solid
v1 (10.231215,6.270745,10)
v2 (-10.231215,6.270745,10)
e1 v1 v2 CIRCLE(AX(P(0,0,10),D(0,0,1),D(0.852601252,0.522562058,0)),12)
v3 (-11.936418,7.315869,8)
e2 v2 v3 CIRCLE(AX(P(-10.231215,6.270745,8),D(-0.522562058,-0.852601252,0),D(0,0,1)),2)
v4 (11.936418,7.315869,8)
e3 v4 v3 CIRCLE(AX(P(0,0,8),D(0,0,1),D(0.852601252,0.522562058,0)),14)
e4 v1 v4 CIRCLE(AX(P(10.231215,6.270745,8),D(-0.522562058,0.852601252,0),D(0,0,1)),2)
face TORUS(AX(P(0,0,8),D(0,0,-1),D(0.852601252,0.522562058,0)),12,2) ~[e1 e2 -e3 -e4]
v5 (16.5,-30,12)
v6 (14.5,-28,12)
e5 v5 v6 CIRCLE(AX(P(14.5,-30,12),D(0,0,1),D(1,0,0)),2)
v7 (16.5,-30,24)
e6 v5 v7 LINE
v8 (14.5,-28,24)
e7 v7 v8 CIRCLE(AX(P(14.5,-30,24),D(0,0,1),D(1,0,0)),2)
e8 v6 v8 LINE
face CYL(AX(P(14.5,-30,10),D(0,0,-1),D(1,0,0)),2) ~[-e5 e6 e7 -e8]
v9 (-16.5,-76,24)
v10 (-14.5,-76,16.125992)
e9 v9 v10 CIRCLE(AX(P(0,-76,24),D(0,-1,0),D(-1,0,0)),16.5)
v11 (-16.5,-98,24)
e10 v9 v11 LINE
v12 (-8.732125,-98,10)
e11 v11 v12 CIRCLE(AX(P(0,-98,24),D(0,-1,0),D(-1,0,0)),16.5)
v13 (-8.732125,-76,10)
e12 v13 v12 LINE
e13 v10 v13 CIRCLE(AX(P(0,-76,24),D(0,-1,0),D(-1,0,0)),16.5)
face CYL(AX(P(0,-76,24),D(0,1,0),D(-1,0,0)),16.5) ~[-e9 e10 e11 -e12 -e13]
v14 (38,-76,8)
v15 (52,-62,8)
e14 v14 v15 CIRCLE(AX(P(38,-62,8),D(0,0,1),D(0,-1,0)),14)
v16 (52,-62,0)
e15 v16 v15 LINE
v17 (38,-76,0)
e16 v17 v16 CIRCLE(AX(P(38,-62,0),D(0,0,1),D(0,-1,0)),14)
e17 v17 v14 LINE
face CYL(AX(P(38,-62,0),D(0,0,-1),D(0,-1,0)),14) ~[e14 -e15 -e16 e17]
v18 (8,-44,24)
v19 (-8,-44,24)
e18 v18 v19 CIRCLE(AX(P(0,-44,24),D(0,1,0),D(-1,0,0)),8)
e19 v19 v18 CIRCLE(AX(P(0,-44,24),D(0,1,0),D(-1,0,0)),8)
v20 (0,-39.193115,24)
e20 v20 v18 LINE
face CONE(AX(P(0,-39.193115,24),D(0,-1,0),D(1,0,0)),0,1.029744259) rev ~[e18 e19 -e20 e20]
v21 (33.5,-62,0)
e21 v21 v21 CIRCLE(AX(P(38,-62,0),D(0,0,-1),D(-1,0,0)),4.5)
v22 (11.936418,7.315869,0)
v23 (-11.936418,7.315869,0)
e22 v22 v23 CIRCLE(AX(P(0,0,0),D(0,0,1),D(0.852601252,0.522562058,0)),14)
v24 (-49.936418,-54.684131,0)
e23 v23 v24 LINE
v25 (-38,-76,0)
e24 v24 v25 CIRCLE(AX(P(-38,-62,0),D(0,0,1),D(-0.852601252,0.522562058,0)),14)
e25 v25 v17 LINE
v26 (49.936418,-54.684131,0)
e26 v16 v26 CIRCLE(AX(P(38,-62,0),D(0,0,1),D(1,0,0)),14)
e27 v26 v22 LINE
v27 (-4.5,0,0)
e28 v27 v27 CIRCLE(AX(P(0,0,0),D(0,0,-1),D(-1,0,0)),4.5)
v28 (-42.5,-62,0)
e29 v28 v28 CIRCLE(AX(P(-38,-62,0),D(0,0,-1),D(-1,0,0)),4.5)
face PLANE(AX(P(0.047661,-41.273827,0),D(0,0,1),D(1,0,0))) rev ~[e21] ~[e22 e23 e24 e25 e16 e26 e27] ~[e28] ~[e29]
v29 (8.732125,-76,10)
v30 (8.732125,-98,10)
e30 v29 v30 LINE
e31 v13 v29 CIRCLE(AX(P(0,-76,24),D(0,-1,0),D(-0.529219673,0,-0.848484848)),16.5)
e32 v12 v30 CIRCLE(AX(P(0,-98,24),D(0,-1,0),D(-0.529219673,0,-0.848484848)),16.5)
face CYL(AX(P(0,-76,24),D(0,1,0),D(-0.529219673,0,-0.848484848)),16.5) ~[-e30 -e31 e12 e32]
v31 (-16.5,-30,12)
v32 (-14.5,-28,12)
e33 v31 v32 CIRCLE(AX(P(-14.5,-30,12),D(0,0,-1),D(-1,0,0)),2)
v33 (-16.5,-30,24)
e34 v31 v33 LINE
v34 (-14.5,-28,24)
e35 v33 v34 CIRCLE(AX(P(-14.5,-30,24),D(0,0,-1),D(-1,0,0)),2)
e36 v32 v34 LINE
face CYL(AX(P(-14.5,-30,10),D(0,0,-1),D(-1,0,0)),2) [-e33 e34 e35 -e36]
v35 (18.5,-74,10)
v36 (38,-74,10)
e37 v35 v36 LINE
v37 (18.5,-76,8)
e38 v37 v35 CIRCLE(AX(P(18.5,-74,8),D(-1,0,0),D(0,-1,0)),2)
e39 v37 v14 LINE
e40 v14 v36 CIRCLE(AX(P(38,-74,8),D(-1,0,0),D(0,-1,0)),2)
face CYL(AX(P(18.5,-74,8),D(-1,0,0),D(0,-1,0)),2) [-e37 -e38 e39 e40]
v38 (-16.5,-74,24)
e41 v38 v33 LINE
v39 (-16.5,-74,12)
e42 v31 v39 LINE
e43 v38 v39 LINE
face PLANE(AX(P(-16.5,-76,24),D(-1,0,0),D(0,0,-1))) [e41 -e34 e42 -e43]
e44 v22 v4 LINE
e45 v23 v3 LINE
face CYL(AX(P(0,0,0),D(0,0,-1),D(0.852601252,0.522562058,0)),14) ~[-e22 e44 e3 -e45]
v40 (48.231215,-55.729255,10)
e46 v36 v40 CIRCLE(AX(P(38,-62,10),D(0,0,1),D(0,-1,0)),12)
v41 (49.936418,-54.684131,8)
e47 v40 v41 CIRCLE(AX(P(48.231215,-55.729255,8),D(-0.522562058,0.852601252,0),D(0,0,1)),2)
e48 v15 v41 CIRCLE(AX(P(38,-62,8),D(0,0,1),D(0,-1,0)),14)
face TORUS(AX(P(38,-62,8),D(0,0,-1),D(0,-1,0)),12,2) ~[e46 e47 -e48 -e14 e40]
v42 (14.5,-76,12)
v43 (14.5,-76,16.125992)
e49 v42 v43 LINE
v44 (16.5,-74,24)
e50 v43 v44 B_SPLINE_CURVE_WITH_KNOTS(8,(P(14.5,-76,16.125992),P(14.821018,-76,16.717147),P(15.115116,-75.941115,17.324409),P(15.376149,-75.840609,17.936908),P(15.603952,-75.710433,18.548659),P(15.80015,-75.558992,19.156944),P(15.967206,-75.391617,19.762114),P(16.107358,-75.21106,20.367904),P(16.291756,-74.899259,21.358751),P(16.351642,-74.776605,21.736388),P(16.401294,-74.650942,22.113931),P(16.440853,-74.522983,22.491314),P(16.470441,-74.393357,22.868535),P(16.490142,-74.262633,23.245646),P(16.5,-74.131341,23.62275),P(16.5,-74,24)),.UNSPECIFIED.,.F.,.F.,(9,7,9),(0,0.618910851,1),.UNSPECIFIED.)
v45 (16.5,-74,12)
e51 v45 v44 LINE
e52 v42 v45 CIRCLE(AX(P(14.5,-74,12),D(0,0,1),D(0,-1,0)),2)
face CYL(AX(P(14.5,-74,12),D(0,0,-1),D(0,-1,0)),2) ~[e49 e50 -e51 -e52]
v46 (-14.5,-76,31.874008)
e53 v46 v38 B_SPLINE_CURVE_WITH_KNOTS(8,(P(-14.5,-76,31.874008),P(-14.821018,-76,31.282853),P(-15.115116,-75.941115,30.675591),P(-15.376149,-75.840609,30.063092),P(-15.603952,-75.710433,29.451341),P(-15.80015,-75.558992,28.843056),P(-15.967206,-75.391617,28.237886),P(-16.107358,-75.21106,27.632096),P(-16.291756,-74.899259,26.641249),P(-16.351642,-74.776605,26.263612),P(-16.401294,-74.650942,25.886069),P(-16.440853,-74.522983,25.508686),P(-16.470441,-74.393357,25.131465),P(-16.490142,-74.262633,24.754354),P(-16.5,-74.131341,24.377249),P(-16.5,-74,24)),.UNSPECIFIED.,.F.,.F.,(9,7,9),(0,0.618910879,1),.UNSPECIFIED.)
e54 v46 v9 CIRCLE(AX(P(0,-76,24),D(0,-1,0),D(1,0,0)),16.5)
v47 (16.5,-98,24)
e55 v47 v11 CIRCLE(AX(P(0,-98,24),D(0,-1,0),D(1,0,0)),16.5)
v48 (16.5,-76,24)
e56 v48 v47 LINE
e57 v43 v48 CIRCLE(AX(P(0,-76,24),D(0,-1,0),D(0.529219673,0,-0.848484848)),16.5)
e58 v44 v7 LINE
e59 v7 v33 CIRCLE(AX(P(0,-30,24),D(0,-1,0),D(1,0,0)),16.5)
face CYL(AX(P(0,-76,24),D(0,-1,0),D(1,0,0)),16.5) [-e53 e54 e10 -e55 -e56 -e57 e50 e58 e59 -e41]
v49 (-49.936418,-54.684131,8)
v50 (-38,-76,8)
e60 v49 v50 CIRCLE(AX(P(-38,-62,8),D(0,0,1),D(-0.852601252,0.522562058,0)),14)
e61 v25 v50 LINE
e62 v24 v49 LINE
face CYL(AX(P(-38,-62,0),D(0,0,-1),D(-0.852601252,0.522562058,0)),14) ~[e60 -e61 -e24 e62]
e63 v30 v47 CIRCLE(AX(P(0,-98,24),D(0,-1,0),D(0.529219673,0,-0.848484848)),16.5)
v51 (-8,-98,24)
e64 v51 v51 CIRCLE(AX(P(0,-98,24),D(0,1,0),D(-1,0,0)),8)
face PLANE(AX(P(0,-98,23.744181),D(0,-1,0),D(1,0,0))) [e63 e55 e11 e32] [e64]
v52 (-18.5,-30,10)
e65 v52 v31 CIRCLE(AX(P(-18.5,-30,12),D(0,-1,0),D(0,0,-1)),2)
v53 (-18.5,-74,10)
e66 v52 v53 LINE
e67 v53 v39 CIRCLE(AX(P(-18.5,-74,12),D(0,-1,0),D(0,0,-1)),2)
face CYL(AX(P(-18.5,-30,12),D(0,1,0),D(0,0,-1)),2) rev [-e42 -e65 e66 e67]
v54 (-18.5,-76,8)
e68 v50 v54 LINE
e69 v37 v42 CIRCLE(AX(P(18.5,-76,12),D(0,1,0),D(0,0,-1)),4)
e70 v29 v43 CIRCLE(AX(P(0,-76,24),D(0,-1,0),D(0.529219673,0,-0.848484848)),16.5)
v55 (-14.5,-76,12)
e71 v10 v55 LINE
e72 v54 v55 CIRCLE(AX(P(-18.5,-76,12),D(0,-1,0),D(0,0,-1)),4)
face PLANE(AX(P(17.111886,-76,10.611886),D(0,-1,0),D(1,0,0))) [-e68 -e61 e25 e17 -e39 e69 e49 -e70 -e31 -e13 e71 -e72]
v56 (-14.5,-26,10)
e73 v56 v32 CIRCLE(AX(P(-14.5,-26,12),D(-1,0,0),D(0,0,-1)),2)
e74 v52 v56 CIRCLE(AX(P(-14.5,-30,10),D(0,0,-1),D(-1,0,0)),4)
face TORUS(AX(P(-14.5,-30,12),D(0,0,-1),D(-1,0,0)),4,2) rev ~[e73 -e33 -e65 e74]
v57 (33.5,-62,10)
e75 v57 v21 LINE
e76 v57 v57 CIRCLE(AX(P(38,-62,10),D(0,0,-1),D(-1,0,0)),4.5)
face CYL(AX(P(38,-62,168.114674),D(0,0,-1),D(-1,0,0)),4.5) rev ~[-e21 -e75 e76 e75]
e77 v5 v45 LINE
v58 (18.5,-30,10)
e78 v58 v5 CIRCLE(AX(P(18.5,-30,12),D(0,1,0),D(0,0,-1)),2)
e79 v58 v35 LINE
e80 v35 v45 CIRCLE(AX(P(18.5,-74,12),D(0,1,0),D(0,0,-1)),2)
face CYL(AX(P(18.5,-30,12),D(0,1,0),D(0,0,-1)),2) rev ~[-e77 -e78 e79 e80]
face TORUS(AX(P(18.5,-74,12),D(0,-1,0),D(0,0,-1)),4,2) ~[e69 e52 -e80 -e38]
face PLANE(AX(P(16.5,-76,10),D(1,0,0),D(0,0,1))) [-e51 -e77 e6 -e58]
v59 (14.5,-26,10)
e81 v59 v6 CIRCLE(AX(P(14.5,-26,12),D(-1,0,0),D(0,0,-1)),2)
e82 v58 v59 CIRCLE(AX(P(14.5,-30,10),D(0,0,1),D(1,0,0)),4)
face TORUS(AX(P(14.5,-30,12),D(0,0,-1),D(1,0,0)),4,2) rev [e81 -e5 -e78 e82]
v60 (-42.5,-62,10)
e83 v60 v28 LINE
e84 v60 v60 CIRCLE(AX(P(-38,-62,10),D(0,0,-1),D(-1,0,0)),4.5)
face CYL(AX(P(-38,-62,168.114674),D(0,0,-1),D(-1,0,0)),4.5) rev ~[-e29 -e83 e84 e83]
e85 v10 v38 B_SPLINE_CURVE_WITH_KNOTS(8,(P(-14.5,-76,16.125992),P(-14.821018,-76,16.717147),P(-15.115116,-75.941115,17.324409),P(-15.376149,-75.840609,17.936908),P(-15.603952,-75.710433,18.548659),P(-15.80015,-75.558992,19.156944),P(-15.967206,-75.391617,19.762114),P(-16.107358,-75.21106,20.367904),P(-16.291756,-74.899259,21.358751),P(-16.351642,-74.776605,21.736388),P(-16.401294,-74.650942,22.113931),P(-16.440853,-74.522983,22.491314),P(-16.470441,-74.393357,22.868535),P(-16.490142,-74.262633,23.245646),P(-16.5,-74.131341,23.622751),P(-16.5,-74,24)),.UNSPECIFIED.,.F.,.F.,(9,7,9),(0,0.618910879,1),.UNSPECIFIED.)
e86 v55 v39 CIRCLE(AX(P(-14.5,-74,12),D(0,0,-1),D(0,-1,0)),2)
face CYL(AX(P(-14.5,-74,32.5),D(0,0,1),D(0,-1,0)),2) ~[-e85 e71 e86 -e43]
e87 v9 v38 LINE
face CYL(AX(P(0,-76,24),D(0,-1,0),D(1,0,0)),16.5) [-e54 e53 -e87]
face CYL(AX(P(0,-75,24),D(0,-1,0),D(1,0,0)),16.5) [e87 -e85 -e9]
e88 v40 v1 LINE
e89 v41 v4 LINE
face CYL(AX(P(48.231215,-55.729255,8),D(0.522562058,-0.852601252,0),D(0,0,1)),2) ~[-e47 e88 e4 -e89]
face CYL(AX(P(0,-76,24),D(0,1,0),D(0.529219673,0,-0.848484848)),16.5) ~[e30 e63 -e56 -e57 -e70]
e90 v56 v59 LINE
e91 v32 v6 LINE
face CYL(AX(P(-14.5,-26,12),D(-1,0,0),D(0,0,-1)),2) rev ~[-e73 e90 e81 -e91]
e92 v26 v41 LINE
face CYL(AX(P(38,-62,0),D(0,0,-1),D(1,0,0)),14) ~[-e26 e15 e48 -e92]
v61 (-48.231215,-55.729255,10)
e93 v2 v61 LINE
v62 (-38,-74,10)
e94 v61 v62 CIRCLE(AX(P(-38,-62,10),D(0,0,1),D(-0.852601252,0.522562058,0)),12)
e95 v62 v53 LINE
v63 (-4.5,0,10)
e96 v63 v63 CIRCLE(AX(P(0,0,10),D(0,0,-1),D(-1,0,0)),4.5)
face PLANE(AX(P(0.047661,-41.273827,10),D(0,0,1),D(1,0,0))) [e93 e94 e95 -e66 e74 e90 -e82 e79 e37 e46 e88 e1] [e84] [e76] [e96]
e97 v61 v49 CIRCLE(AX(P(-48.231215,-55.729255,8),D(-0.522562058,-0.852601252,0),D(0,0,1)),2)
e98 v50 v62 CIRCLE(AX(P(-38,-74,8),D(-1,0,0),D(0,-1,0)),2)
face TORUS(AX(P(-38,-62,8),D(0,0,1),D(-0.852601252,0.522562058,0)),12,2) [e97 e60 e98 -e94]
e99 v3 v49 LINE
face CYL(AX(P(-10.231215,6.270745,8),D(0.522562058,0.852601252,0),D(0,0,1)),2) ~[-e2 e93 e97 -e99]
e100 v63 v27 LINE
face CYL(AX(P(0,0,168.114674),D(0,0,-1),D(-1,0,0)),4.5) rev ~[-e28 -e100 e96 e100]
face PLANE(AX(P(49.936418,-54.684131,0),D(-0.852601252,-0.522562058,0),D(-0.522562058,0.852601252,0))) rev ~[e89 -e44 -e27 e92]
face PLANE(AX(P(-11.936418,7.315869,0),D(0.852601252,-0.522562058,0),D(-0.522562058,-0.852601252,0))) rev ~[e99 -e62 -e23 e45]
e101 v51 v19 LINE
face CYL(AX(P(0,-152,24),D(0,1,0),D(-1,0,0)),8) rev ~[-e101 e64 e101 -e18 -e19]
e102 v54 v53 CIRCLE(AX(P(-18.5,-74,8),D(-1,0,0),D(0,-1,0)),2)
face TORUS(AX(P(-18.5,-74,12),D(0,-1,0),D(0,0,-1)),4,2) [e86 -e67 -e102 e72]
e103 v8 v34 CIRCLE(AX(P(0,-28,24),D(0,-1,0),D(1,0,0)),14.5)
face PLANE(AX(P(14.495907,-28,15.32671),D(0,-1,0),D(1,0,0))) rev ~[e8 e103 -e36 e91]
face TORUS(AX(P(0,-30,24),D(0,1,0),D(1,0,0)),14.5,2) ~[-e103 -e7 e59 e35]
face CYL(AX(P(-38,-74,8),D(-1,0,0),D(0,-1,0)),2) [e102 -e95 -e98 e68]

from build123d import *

# Parameters (mm, degrees)
F1_DEPTH     = 10
F3_DEPTH     = 22
F4_DEPTH     = 48
F6_D         = 16
F6_DEPTH     = 54
F6_TIP       = 4.8068849522
F7_T1_DEPTH  = 14
F7_T4_ANGLE  = 180
F7_T5_DEPTH  = 46
F7_T7_DEPTH  = 29
F7_T10_ANGLE = 90
F7_T12_ANGLE = 90
F7_T13_DEPTH = 19.5
F7_T15_DEPTH = 19.5
F7_T17_DEPTH = 72.7186358508
F7_T19_DEPTH = 72.7186358508
F7_T22_ANGLE = 121.5042667192
F7_T26_DEPTH = 20.5
F7_S27_R     = 16.5
F7_T28_DEPTH = 12
F7_T32_DEPTH = 20.5
F7_S33_R     = 16.5
F7_T34_DEPTH = 12
F7_T36_ANGLE = 121.5042667192
F7_T38_ANGLE = 116.9914665616
F7_T40_ANGLE = 90
F7_T42_ANGLE = 90
F9_D         = 9


# Not quite as in the source:
# - a fillet or chamfer that OpenCascade refuses, or shapes differently, is made with other operations: its cross-section is extruded or revolved along the edge and cut away or added


with BuildPart() as f1:
    # F0 (on Top) → F1 (new body)
    with BuildSketch(Plane.XY):
        with BuildLine():
            ThreePointArc((11.9364175338, 7.315868811), (13.4742318051, 3.8006680023), (14, 0))
            ThreePointArc((14, 0), (-3.8006680023, -13.4742318051), (-11.9364175338, 7.315868811))
            Line((-11.9364175338, 7.315868811), (-49.9364175338, -54.684131189))
            ThreePointArc((-49.9364175338, -54.684131189), (-34.1993319977, -48.5257681949), (-24, -62))
            ThreePointArc((-24, -62), (-28.1005050634, -71.8994949366), (-38, -76))
            Line((-38, -76), (38, -76))
            ThreePointArc((38, -76), (25.7848012019, -55.1597574368), (49.9364175338, -54.684131189))
            Line((49.9364175338, -54.684131189), (11.9364175338, 7.315868811))
        make_face()
        with BuildLine():
            ThreePointArc((-24, -62), (-34.1993319977, -48.5257681949), (-49.9364175338, -54.684131189))
            ThreePointArc((-49.9364175338, -54.684131189), (-50.2151987981, -68.8402425632), (-38, -76))
            ThreePointArc((-38, -76), (-28.1005050634, -71.8994949366), (-24, -62))
        make_face()
        with BuildLine():
            ThreePointArc((-11.9364175338, 7.315868811), (-3.8006680023, -13.4742318051), (14, 0))
            ThreePointArc((14, 0), (13.4742318051, 3.8006680023), (11.9364175338, 7.315868811))
            ThreePointArc((11.9364175338, 7.315868811), (0, 14), (-11.9364175338, 7.315868811))
        make_face()
        with BuildLine():
            ThreePointArc((52, -62), (51.4742318051, -58.1993319977), (49.9364175338, -54.684131189))
            ThreePointArc((49.9364175338, -54.684131189), (25.7848012019, -55.1597574368), (38, -76))
            ThreePointArc((38, -76), (47.8994949366, -71.8994949366), (52, -62))
        make_face()
    extrude(amount=F1_DEPTH)

    # F2 (on face) → F3 (join)
    with BuildSketch(Plane.XZ.offset(76)):
        with BuildLine():
            ThreePointArc((8.7321245983, 10), (14.4279252818, 15.9946910076), (16.5, 24))
            ThreePointArc((16.5, 24), (0, 40.5), (-16.5, 24))
            ThreePointArc((-16.5, 24), (-14.4279252818, 15.9946910076), (-8.7321245983, 10))
            Line((-8.7321245983, 10), (8.7321245983, 10))
        make_face()
        with BuildLine():
            ThreePointArc((-8.7321245983, 10), (0, 7.5), (8.7321245983, 10))
            Line((8.7321245983, 10), (-8.7321245983, 10))
        make_face()
    extrude(amount=F3_DEPTH)

    # F2 (on face) → F4 (join)
    with BuildSketch(Plane.XZ.offset(76)):
        with BuildLine():
            Line((16.5, 10), (16.5, 24))
            ThreePointArc((16.5, 24), (14.4279252818, 15.9946910076), (8.7321245983, 10))
            Line((8.7321245983, 10), (16.5, 10))
        make_face()
        with BuildLine():
            ThreePointArc((8.7321245983, 10), (14.4279252818, 15.9946910076), (16.5, 24))
            ThreePointArc((16.5, 24), (0, 40.5), (-16.5, 24))
            ThreePointArc((-16.5, 24), (-14.4279252818, 15.9946910076), (-8.7321245983, 10))
            Line((-8.7321245983, 10), (8.7321245983, 10))
        make_face()
        with BuildLine():
            ThreePointArc((-8.7321245983, 10), (-14.4279252818, 15.9946910076), (-16.5, 24))
            Line((-16.5, 24), (-16.5, 10))
            Line((-16.5, 10), (-8.7321245983, 10))
        make_face()
    extrude(amount=-F4_DEPTH)

    # F6
    with Locations(Plane.XZ.offset(98)):
        with Locations((0, 24)):
            Hole(F6_D / 2, depth=F6_DEPTH)
            with Locations((0, 0, -(F6_DEPTH + F6_TIP / 2))):  # 118° drill point
                Cone(0, F6_D / 2, F6_TIP, mode=Mode.SUBTRACT)

    # F7: fillet of radius 2 on 15 edges, made by hand

    # F7_s2 → F7_t1 (cut)
    with BuildSketch(Plane.XY.offset(10)):
        with BuildLine():
            ThreePointArc((-16.5, -30), (-15.9142135624, -28.5857864376), (-14.5, -28))
            Line((-14.5, -28), (-16.5, -28))
            Line((-16.5, -28), (-16.5, -30))
        make_face()
        with BuildLine():
            ThreePointArc((16.5, -30), (15.9142135624, -28.5857864376), (14.5, -28))
            Line((14.5, -28), (16.5, -28))
            Line((16.5, -28), (16.5, -30))
        make_face()
    extrude(amount=F7_T1_DEPTH, mode=Mode.SUBTRACT)

    # F7_s3 → F7_t4 (revolve, cut)
    with BuildSketch(Plane.XY.offset(24)):
        with BuildLine():
            ThreePointArc((16.5, -30), (15.9142135624, -28.5857864376), (14.5, -28))
            Line((14.5, -28), (16.5, -28))
            Line((16.5, -28), (16.5, -30))
        make_face()
    revolve(axis=Axis((0, -28, 24), (0, -1, 0)), revolution_arc=F7_T4_ANGLE, mode=Mode.SUBTRACT)

    # F7_s6 → F7_t5 (join)
    with BuildSketch(Plane.XZ.offset(30)):
        with BuildLine():
            ThreePointArc((18.5, 10), (17.0857864376, 10.5857864376), (16.5, 12))
            Line((16.5, 12), (16.5, 10))
            Line((16.5, 10), (18.5, 10))
        make_face()
        with BuildLine():
            ThreePointArc((-18.5, 10), (-17.0857864376, 10.5857864376), (-16.5, 12))
            Line((-16.5, 12), (-16.5, 10))
            Line((-16.5, 10), (-18.5, 10))
        make_face()
    extrude(amount=F7_T5_DEPTH)

    # F7_s8 → F7_t7 (join)
    with BuildSketch(Plane.YZ.offset(-14.5)):
        with BuildLine():
            ThreePointArc((-26, 10), (-27.4142135624, 10.5857864376), (-28, 12))
            Line((-28, 12), (-28, 10))
            Line((-28, 10), (-26, 10))
        make_face()
    extrude(amount=F7_T7_DEPTH)

    # F7_s9 → F7_t10 (revolve)
    with BuildSketch(Plane.XZ.offset(30)):
        with BuildLine():
            ThreePointArc((-18.5, 10), (-17.0857864376, 10.5857864376), (-16.5, 12))
            Line((-16.5, 12), (-16.5, 10))
            Line((-16.5, 10), (-18.5, 10))
        make_face()
    revolve(axis=Axis((-14.5, -30, 10), (0, 0, -1)), revolution_arc=F7_T10_ANGLE)

    # F7_s11 → F7_t12 (revolve)
    with BuildSketch(Plane.XZ.offset(30)):
        with BuildLine():
            ThreePointArc((18.5, 10), (17.0857864376, 10.5857864376), (16.5, 12))
            Line((16.5, 12), (16.5, 10))
            Line((16.5, 10), (18.5, 10))
        make_face()
    revolve(axis=Axis((14.5, -30, 10), (0, 0, 1)), revolution_arc=F7_T12_ANGLE)

    # F7_s14 → F7_t13 (cut)
    with BuildSketch(Plane.YZ.offset(-38)):
        with BuildLine():
            ThreePointArc((-76, 8), (-75.4142135624, 9.4142135624), (-74, 10))
            Line((-74, 10), (-76, 10))
            Line((-76, 10), (-76, 8))
        make_face()
    extrude(amount=F7_T13_DEPTH, mode=Mode.SUBTRACT)

    # F7_s16 → F7_t15 (cut)
    with BuildSketch(Plane.YZ.offset(18.5)):
        with BuildLine():
            ThreePointArc((-76, 8), (-75.4142135624, 9.4142135624), (-74, 10))
            Line((-74, 10), (-76, 10))
            Line((-76, 10), (-76, 8))
        make_face()
    extrude(amount=F7_T15_DEPTH, mode=Mode.SUBTRACT)

    # F7_s18 → F7_t17 (cut)
    with BuildSketch(Plane(origin=(0, 0, 0), x_dir=(0, 0, 1), z_dir=(-0.5225620579, -0.8526012524, 0))):
        with BuildLine():
            ThreePointArc((10, 12), (9.4142135624, 13.4142135624), (8, 14))
            Line((8, 14), (10, 14))
            Line((10, 14), (10, 12))
        make_face()
    extrude(amount=F7_T17_DEPTH, mode=Mode.SUBTRACT)

    # F7_s20 → F7_t19 (cut)
    with BuildSketch(Plane(origin=(38, -62, 0), x_dir=(0, 0, 1), z_dir=(-0.5225620579, 0.8526012524, 0))):
        with BuildLine():
            ThreePointArc((10, 12), (9.4142135624, 13.4142135624), (8, 14))
            Line((8, 14), (10, 14))
            Line((10, 14), (10, 12))
        make_face()
    extrude(amount=F7_T19_DEPTH, mode=Mode.SUBTRACT)

    # F7_s21 → F7_t22 (revolve, cut)
    with BuildSketch(Plane.YZ.offset(38)):
        with BuildLine():
            ThreePointArc((-74, 10), (-75.4142135624, 9.4142135624), (-76, 8))
            Line((-76, 8), (-76, 10))
            Line((-76, 10), (-74, 10))
        make_face()
    revolve(axis=Axis((38, -62, 10), (0, 0, 1)), revolution_arc=F7_T22_ANGLE, mode=Mode.SUBTRACT)


with BuildPart() as f7_tool24:
    # F7_s25 → F7_t26 (new body)
    with BuildSketch(Plane.XY.offset(12)):
        with BuildLine():
            ThreePointArc((14.5, -76), (15.9142135624, -75.4142135624), (16.5, -74))
            Line((16.5, -74), (16.5, -76))
            Line((16.5, -76), (14.5, -76))
        make_face()
    extrude(amount=F7_T26_DEPTH)

    # F7_s27 → F7_t28 (cut, symmetric)
    with BuildSketch(Plane.XZ.offset(75)):
        with Locations((0, 24)):
            Circle(F7_S27_R)
    extrude(amount=F7_T28_DEPTH, both=True, mode=Mode.SUBTRACT)


with BuildPart() as f1_1:
    add(f1.part)

    # F7_t23: cut F7_tool24
    add(f7_tool24.part, mode=Mode.SUBTRACT)


with BuildPart() as f7_tool30:
    # F7_s31 → F7_t32 (new body)
    with BuildSketch(Plane.XY.offset(32.5)):
        with BuildLine():
            ThreePointArc((-14.5, -76), (-15.9142135624, -75.4142135624), (-16.5, -74))
            Line((-16.5, -74), (-16.5, -76))
            Line((-16.5, -76), (-14.5, -76))
        make_face()
    extrude(amount=-F7_T32_DEPTH)

    # F7_s33 → F7_t34 (cut, symmetric)
    with BuildSketch(Plane.XZ.offset(75)):
        with Locations((0, 24)):
            Circle(F7_S33_R)
    extrude(amount=F7_T34_DEPTH, both=True, mode=Mode.SUBTRACT)


with BuildPart() as f1_2:
    add(f1_1.part)

    # F7_t29: cut F7_tool30
    add(f7_tool30.part, mode=Mode.SUBTRACT)

    # F7_s35 → F7_t36 (revolve, cut)
    with BuildSketch(Plane(origin=(-38, -62, 0), x_dir=(0, 0, 1), z_dir=(0.5225620579, 0.8526012524, 0))):
        with BuildLine():
            ThreePointArc((8, -14), (9.4142135624, -13.4142135624), (10, -12))
            Line((10, -12), (10, -14))
            Line((10, -14), (8, -14))
        make_face()
    revolve(axis=Axis((-38, -62, 10), (0, 0, 1)), revolution_arc=F7_T36_ANGLE, mode=Mode.SUBTRACT)

    # F7_s37 → F7_t38 (revolve, cut)
    with BuildSketch(Plane(origin=(0, 0, 0), x_dir=(0, 0, 1), z_dir=(0.5225620579, -0.8526012524, 0))):
        with BuildLine():
            ThreePointArc((10, -12), (9.4142135624, -13.4142135624), (8, -14))
            Line((8, -14), (10, -14))
            Line((10, -14), (10, -12))
        make_face()
    revolve(axis=Axis((0, 0, 10), (0, 0, 1)), revolution_arc=F7_T38_ANGLE, mode=Mode.SUBTRACT)

    # F7_s39 → F7_t40 (revolve, cut)
    with BuildSketch(Plane.YZ.offset(18.5)):
        with BuildLine():
            ThreePointArc((-76, 8), (-75.4142135624, 9.4142135624), (-74, 10))
            Line((-74, 10), (-76, 10))
            Line((-76, 10), (-76, 8))
        make_face()
    revolve(axis=Axis((18.5, -76, 12), (0, 1, 0)), revolution_arc=F7_T40_ANGLE, mode=Mode.SUBTRACT)

    # F7_s41 → F7_t42 (revolve, cut)
    with BuildSketch(Plane.YZ.offset(-18.5)):
        with BuildLine():
            ThreePointArc((-76, 8), (-75.4142135624, 9.4142135624), (-74, 10))
            Line((-74, 10), (-76, 10))
            Line((-76, 10), (-76, 8))
        make_face()
    revolve(axis=Axis((-18.5, -76, 12), (0, -1, 0)), revolution_arc=F7_T42_ANGLE, mode=Mode.SUBTRACT)

    # F9 (through all)
    with Locations(Plane.XY.offset(10)):
        with Locations((38, -62), (0, 0), (-38, -62)):
            Hole(F9_D / 2)


solid = f1_2.part
